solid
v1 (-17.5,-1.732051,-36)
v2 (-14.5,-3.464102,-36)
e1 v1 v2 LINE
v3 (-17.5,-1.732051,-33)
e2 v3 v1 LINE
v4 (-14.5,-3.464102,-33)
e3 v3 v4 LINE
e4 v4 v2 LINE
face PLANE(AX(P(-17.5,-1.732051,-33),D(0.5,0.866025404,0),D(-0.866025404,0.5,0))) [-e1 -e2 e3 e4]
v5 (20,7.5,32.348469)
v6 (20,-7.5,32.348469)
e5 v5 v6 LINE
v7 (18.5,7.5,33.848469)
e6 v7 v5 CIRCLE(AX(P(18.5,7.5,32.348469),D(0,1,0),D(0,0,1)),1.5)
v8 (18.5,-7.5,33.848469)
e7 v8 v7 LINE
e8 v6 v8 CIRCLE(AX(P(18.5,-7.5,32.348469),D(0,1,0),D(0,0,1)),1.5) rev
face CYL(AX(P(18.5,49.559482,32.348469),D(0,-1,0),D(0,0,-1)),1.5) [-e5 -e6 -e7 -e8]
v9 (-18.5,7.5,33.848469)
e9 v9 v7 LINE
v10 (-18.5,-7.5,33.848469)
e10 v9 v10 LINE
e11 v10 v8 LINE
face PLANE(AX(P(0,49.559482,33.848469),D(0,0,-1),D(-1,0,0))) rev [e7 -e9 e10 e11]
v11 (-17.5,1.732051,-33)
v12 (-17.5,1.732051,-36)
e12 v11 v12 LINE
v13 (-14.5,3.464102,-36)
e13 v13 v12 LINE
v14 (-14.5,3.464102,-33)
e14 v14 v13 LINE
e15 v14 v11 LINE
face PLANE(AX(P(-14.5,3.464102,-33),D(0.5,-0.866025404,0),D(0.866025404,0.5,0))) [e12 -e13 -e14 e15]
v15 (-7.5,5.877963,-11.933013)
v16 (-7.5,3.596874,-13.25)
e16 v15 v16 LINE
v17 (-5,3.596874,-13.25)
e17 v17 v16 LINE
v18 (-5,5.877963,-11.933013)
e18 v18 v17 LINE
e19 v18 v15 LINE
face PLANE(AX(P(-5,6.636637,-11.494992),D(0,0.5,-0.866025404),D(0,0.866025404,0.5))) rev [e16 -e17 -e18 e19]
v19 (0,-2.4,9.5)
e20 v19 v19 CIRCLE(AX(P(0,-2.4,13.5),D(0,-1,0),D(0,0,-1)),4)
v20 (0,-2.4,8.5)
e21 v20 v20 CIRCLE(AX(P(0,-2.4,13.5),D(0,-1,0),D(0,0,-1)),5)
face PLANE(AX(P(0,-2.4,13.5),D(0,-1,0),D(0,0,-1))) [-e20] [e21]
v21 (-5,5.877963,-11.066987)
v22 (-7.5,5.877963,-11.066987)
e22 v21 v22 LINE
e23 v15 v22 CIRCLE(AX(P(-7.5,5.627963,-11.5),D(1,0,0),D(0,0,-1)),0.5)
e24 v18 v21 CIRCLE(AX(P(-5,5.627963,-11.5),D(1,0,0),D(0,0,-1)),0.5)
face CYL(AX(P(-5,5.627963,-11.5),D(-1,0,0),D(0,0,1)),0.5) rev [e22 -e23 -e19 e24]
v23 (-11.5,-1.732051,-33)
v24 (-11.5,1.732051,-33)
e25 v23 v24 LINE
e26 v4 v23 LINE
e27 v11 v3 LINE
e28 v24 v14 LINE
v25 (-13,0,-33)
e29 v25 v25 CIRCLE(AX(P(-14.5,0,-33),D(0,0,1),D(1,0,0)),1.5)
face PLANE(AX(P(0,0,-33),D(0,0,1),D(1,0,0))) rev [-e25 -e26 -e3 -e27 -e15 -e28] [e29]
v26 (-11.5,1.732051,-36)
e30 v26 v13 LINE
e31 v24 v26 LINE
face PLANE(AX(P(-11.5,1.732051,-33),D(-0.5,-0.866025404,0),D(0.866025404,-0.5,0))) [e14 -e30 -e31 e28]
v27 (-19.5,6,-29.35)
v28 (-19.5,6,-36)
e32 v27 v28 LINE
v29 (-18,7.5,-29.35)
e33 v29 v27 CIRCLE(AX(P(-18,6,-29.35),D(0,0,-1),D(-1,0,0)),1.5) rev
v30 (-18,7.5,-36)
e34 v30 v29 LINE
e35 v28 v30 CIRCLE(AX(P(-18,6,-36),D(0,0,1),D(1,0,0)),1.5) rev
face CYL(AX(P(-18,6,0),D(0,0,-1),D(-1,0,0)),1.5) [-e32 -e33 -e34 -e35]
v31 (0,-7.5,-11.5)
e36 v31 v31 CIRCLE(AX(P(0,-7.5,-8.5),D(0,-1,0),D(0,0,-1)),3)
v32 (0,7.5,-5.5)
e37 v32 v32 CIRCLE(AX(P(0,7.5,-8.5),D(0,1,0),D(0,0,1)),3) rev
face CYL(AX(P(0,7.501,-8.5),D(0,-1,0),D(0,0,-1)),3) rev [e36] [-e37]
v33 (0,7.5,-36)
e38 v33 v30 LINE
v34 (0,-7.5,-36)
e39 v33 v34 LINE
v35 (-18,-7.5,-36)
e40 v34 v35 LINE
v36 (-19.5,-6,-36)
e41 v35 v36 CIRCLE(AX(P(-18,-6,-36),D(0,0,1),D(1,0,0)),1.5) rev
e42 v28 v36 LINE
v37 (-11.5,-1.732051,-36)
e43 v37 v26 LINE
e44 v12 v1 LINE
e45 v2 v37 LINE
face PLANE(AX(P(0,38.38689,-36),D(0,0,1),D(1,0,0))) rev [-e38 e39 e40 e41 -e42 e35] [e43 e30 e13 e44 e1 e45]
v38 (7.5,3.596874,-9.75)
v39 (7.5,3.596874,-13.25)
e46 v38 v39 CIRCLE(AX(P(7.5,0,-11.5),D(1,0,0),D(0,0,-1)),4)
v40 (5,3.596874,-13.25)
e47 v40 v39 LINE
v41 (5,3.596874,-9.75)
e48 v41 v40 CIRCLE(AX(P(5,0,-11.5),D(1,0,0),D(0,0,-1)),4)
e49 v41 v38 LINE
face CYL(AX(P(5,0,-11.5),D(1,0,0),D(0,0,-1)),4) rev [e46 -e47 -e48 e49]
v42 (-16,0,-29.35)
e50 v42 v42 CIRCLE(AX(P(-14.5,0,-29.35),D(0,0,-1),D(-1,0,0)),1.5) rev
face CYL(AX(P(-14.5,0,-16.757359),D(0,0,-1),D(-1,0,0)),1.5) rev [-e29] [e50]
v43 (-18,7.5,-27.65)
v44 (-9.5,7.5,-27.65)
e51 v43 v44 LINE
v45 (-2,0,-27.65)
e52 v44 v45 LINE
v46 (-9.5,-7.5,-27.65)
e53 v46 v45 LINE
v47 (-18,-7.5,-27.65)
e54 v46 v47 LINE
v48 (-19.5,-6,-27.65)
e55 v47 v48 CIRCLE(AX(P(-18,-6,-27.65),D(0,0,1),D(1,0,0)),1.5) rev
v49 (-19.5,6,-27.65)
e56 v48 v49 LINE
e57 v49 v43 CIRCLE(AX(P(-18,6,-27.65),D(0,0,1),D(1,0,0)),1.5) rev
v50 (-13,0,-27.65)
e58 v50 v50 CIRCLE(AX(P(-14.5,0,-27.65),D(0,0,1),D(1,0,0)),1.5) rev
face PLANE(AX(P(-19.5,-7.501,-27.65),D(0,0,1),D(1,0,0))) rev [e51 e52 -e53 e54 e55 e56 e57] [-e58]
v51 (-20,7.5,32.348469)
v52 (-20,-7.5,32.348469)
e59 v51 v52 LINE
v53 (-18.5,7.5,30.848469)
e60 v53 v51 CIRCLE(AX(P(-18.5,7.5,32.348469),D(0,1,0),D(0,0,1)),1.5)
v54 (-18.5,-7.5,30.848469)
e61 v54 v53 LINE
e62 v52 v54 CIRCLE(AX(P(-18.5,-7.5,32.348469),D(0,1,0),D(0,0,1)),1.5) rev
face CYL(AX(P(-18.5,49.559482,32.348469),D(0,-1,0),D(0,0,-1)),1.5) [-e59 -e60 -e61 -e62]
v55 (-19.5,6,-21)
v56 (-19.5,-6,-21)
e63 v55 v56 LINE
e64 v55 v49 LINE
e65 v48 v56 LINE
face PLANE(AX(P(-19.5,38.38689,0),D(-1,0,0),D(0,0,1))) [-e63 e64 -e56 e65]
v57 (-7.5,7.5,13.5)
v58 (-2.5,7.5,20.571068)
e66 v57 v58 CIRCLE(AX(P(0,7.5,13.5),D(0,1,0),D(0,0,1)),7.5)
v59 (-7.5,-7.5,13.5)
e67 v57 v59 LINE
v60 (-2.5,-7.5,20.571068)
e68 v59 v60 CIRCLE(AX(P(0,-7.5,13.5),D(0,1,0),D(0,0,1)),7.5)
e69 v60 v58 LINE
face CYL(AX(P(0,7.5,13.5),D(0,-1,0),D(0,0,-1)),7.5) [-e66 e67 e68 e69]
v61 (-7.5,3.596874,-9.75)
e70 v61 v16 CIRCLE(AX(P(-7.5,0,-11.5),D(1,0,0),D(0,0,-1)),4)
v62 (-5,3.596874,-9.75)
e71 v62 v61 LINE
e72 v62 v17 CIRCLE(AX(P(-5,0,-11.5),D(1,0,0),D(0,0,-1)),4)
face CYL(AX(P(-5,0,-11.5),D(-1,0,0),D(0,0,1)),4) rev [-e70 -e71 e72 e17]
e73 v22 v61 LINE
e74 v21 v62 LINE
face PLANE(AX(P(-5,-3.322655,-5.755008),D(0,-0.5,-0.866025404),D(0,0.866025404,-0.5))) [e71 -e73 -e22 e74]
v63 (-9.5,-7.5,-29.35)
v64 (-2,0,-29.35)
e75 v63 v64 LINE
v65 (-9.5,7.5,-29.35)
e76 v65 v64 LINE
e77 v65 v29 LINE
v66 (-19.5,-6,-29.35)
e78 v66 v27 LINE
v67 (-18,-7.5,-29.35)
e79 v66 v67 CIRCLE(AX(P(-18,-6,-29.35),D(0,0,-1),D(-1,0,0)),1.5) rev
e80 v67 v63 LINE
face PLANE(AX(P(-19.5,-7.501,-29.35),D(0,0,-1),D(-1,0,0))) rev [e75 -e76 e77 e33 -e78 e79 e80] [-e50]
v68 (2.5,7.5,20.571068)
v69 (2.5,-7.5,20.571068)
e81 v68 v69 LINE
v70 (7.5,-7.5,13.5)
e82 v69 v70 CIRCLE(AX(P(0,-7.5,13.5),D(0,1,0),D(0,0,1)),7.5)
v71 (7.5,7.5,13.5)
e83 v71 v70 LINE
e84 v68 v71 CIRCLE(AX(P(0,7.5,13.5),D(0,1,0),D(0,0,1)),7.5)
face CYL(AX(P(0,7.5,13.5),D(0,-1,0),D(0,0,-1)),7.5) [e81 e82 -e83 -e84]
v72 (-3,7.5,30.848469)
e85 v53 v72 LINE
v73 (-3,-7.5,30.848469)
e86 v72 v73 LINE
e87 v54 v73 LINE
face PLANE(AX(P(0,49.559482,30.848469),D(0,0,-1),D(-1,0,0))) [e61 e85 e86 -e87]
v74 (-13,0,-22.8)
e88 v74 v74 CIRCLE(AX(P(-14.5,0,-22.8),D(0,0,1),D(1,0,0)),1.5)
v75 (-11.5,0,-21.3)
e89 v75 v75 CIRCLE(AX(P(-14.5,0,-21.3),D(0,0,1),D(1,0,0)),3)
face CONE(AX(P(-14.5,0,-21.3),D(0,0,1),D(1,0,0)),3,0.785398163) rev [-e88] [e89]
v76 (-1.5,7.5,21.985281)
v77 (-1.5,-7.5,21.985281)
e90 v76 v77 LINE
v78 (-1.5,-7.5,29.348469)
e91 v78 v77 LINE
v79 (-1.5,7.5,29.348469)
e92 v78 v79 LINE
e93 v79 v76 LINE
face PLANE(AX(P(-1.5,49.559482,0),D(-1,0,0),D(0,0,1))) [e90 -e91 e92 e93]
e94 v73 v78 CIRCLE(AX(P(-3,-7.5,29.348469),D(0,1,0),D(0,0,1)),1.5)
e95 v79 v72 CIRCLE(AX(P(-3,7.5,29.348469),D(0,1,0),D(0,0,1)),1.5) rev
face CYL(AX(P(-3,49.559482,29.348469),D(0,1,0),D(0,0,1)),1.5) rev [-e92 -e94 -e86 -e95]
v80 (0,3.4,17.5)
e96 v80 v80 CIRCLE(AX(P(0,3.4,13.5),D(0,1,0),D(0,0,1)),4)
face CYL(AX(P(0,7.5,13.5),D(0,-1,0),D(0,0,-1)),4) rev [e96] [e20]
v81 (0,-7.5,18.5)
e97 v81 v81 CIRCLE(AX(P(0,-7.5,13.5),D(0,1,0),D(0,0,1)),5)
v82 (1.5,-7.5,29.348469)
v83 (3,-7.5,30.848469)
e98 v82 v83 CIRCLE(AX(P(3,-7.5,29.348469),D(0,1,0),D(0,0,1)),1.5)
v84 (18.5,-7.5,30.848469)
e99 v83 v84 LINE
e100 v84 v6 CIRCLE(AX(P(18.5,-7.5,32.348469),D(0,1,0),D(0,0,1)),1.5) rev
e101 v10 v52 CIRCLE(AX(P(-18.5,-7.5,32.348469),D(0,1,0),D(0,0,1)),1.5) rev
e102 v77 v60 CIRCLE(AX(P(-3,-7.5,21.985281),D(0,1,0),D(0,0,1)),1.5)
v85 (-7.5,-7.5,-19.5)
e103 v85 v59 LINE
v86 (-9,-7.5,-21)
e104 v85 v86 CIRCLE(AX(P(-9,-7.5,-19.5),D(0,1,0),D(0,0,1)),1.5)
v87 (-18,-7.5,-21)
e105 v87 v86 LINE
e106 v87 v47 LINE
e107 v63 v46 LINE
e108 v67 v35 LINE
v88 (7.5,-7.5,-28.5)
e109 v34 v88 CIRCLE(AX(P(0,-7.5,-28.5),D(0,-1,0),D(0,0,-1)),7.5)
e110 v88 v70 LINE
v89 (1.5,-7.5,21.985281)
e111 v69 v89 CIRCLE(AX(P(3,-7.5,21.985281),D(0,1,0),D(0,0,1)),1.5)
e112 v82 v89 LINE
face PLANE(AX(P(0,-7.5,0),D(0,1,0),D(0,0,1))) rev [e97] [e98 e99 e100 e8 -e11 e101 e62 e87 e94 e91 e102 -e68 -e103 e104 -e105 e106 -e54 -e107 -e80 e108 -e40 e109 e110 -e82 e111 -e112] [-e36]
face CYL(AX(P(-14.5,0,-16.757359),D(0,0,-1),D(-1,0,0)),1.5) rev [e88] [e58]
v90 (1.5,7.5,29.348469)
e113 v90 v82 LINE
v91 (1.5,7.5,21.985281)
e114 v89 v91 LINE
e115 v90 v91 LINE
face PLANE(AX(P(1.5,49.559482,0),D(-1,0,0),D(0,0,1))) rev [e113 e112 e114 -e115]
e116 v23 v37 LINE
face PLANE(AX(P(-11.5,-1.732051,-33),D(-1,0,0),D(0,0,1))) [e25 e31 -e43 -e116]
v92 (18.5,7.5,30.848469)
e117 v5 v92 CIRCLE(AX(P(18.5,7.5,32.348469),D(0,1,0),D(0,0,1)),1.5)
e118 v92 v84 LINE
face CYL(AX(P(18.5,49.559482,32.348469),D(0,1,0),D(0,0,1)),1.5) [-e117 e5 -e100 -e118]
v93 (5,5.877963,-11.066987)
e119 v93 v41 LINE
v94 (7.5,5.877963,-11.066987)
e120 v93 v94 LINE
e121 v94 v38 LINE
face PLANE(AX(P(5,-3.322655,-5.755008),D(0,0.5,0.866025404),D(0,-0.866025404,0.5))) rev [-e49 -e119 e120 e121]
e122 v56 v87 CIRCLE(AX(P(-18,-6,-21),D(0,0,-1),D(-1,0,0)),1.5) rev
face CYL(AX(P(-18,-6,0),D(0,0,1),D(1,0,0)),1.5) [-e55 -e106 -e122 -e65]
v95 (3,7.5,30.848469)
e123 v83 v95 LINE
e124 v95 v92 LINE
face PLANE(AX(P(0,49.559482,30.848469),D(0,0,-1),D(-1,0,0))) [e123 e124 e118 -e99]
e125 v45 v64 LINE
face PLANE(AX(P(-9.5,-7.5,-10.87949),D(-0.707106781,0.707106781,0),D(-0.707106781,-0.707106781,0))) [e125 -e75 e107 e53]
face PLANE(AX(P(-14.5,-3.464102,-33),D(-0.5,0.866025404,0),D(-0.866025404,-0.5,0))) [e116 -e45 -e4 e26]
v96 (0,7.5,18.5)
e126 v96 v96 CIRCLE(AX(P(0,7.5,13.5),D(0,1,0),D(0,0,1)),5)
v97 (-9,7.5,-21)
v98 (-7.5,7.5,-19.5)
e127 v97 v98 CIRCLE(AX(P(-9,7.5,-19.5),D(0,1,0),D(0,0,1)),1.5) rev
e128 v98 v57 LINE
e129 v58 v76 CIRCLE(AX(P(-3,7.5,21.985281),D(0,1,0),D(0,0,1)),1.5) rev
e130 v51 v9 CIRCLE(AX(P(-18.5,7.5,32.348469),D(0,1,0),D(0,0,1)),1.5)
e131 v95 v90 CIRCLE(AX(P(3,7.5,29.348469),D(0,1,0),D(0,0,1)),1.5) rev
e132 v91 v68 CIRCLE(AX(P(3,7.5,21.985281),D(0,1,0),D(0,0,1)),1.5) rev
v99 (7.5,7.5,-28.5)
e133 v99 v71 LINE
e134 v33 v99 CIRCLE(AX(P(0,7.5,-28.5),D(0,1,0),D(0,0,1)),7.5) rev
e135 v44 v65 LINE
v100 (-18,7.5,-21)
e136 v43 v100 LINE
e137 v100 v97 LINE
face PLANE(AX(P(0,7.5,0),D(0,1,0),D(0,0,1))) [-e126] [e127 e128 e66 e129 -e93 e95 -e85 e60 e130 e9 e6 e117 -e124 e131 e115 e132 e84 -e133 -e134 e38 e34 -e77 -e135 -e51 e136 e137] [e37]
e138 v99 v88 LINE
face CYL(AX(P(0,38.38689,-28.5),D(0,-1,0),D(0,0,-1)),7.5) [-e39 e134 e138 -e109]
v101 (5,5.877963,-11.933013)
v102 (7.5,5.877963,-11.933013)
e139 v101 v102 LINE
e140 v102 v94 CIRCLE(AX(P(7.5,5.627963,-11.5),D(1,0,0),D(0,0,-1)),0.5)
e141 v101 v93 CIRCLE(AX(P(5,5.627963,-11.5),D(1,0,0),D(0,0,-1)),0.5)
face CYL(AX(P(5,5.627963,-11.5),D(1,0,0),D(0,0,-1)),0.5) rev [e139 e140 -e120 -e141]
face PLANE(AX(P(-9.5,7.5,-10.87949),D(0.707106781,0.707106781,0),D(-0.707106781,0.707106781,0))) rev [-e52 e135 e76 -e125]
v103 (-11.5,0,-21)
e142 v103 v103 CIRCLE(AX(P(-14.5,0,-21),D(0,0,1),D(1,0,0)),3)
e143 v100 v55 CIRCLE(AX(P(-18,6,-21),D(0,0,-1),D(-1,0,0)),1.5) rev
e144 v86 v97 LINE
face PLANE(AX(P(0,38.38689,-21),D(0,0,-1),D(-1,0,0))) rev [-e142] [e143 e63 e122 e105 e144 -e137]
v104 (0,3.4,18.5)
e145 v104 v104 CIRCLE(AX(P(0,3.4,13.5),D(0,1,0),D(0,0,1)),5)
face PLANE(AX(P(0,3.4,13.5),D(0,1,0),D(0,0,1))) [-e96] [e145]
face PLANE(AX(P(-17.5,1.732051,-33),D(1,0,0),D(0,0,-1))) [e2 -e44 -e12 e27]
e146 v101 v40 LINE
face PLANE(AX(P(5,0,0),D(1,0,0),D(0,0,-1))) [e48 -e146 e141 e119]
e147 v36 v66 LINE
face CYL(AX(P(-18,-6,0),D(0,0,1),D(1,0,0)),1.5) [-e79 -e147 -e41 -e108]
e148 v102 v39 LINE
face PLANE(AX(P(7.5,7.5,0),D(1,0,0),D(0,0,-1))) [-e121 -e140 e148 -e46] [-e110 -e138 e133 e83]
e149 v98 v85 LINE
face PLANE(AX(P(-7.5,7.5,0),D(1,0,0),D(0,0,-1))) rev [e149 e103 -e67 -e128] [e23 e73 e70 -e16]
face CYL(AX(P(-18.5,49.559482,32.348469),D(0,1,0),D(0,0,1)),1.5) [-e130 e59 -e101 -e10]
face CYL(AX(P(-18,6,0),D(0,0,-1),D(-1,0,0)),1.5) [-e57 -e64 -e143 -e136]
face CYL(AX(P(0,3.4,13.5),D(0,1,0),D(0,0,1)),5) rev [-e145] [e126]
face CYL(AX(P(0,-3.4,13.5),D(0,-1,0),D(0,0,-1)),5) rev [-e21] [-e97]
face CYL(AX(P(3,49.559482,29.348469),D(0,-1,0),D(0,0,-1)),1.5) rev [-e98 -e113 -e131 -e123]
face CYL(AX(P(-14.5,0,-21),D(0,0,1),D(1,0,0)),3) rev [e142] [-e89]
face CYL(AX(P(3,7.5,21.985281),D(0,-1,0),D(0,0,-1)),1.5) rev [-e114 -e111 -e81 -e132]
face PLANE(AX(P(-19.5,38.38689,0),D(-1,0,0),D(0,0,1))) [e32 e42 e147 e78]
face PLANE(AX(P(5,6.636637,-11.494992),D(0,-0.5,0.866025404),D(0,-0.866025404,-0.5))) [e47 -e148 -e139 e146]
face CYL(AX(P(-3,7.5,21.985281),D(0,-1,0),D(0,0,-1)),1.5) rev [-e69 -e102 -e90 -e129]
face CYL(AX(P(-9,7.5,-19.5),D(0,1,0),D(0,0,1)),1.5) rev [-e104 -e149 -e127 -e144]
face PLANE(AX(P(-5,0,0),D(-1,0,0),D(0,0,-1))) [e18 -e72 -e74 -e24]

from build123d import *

# Parameters (mm, degrees)
SKETCH1_R           = 4
BOSS_EXTRUDE1_DEPTH = 7.5
SKETCH2_R           = 5
CUT_EXTRUDE1_DEPTH  = 4.1
SKETCH12_R          = 5
SKETCH12_R_2        = 4
CUT_EXTRUDE10_DEPTH = 1
CUT_EXTRUDE3_DEPTH  = 2.5
BOSS_EXTRUDE3_DEPTH = 15
CUT_EXTRUDE7_REACH  = 45.603
SKETCH7_W           = 10
SKETCH7_H           = 1.7
CUT_EXTRUDE8_REACH  = 76.732
SKETCH8_R           = 1.5
CUT_EXTRUDE9_DEPTH  = 3
CUT_EXTRUDE11_DEPTH = 1.7
BOSS_EXTRUDE2_START = -15
BOSS_EXTRUDE2_DEPTH = 15
FILLET8_R           = 1.5
CUT_EXTRUDE12_REACH = 45.829
SKETCH19_R          = 3


with BuildPart() as part:
    # Sketch1 → Boss-Extrude1 (new, symmetric)
    with BuildSketch(Plane(origin=(0, 0, 0), x_dir=(1, 0, 0), z_dir=(0, 1, 0))):
        with BuildLine():
            Line((7.5, 21), (-7.5, 21))
            Line((-7.5, 21), (-7.5, -13.499999984))
            ThreePointArc((-7.5, -13.499999984), (-8e-09, -21), (7.5, -13.5))
            Line((7.5, -13.5), (7.5, 21))
        make_face()
        with Locations(Location((0, -13.5, 0), (0, 0, 270))):
            Circle(SKETCH1_R, mode=Mode.SUBTRACT)
    extrude(amount=BOSS_EXTRUDE1_DEPTH, both=True)

    # Sketch2 → Cut-Extrude1 (cut)
    with BuildSketch(Plane(origin=(0, 7.5, 0), x_dir=(1, 0, 0), z_dir=(0, 1, 0))):
        with Locations(Location((0, -13.5, 0), (0, 0, 270))):
            Circle(SKETCH2_R)
    cut_extrude1 = extrude(amount=-CUT_EXTRUDE1_DEPTH, mode=Mode.SUBTRACT)

    # Mirror1: Cut-Extrude1 across plane
    add(cut_extrude1.mirror(Plane.ZX), mode=Mode.SUBTRACT)

    # Sketch12 → Cut-Extrude10 (cut)
    with BuildSketch(Plane.XZ.offset(3.4)):
        with Locations(Location((0, 13.5, 0), (0, 0, 90))):
            Circle(SKETCH12_R)
        with Locations(Location((0, 13.5, 0), (0, 0, 270))):
            Circle(SKETCH12_R_2, mode=Mode.SUBTRACT)
    extrude(amount=-CUT_EXTRUDE10_DEPTH, mode=Mode.SUBTRACT)

    # Sketch4 → Cut-Extrude3 (cut)
    with BuildSketch(Plane(origin=(7.5, 0, 0), x_dir=(0, 0, -1), z_dir=(1, 0, 0))):
        with BuildLine():
            Line((13.25, 3.596873642), (11.933012728, 5.87796251))
            ThreePointArc((11.933012728, 5.87796251), (11.500000041, 6.127962556), (11.066987313, 5.877962581))
            Line((11.066987313, 5.877962581), (9.75, 3.596873642))
            ThreePointArc((9.75, 3.596873642), (11.5, -4), (13.25, 3.596873642))
        make_face()
    cut_extrude3 = extrude(amount=-CUT_EXTRUDE3_DEPTH, mode=Mode.SUBTRACT)

    # Mirror2: Cut-Extrude3 across plane
    add(cut_extrude3.mirror(Plane(origin=(0, 0, 0), x_dir=(0, 0, 1), z_dir=(1, 0, 0))), mode=Mode.SUBTRACT)

    # Sketch18 → Boss-Extrude3 (add)
    with BuildSketch(Plane.XZ.offset(7.5)):
        with BuildLine():
            Line((-19.5, -21), (-19.5, -36))
            Line((-19.5, -36), (0, -36))
            ThreePointArc((0, -36), (5.303300859, -33.803300859), (7.5, -28.5))
            Line((7.5, -28.5), (7.5, -21))
            Line((7.5, -21), (-19.5, -21))
        make_face()
    extrude(amount=-BOSS_EXTRUDE3_DEPTH)

    # Sketch7 → Cut-Extrude7 (cut, up to next)
    with BuildSketch(Plane(origin=(0, 7.5, 0), x_dir=(1, 0, 0), z_dir=(0, 1, 0)), mode=Mode.PRIVATE) as cut_extrude7_sk1:
        with Locations((-14.5, 28.5)):
            Rectangle(SKETCH7_W, SKETCH7_H)
    cut_extrude7_tool1 = extrude(cut_extrude7_sk1.sketch, amount=-CUT_EXTRUDE7_REACH, mode=Mode.PRIVATE) & part.part
    add(cut_extrude7_tool1.solids().sort_by_distance((-14.5, 7.5, -28.5))[0], mode=Mode.SUBTRACT)

    # Cut-Extrude8: up to this face of the body (flat: up to its plane)
    cut_extrude8_end = Plane(part.part.faces().sort_by_distance((-13.5, 0, -21))[0])
    # Sketch8 → Cut-Extrude8 (cut, up to the picked face)
    with BuildSketch(Plane(origin=(-40.245190528, 0, -36), x_dir=(1, 0, 0), z_dir=(0, 0, 1)), mode=Mode.PRIVATE) as cut_extrude8_sk1:
        with Locations(Location((25.745190528, 0, 0), (0, 0, 180))):
            Circle(SKETCH8_R)
    cut_extrude8_tool1 = split(extrude(cut_extrude8_sk1.sketch, amount=CUT_EXTRUDE8_REACH, mode=Mode.PRIVATE), bisect_by=cut_extrude8_end, keep=Keep.BOTH, mode=Mode.PRIVATE)
    add(cut_extrude8_tool1.solids().sort_by(Axis((-14.5, 0, -36), (0, 0, 1)))[0], mode=Mode.SUBTRACT)

    # Sketch10 → CSK for M3 Flat Head Machine Screw1 (revolve, cut)
    with BuildSketch(Plane(origin=(-14.5, 0, -21), x_dir=(0, -1, 0), z_dir=(1, 0, 0))):
        Polygon((0, 0), (0, 5.901290929), (1.5, 5), (1.5, 1.8), (3, 0.3), (3, 0), align=None)
    revolve(axis=Axis((-14.5, 0, -14.65), (0, 0, -1)), mode=Mode.SUBTRACT)

    # Sketch11 → Cut-Extrude9 (cut)
    with BuildSketch(Plane(origin=(15, 0, -36), x_dir=(1, 0, 0), z_dir=(0, 0, 1))):
        Polygon((-29.5, -3.464101615), (-26.5, -1.732050808), (-26.5, 1.732050808), (-29.5, 3.464101615), (-32.5, 1.732050808), (-32.5, -1.732050808), align=None)
    extrude(amount=CUT_EXTRUDE9_DEPTH, mode=Mode.SUBTRACT)

    # Sketch13 → Cut-Extrude11 (cut)
    with BuildSketch(Plane(origin=(-44.653589838, 0, -29.35), x_dir=(1, 0, 0), z_dir=(0, 0, 1))):
        Polygon((35.153589838, 7.5), (42.653589838, 0), (35.153589838, -7.5), align=None)
    extrude(amount=CUT_EXTRUDE11_DEPTH, mode=Mode.SUBTRACT)

    # Sketch16 → Boss-Extrude2 (add)
    with BuildSketch(Plane.XZ.offset(7.5).offset(BOSS_EXTRUDE2_START)):
        with BuildLine():
            Line((1.5, 30.848469228), (-1.5, 30.848469228))
            Line((-1.5, 30.848469228), (-1.5, 20.848469228))
            ThreePointArc((-1.5, 20.848469228), (0, 21), (1.5, 20.848469228))
            Line((1.5, 20.848469228), (1.5, 30.848469228))
        make_face()
        Polygon((-20, 30.848469228), (-1.5, 30.848469228), (1.5, 30.848469228), (20, 30.848469228), (20, 33.848469228), (-20, 33.848469228), align=None)
    extrude(amount=BOSS_EXTRUDE2_DEPTH)

    # Fillet8
    fillet8_edges = [part.edges().sort_by_distance(p)[0] for p in [
        (20, 0, 30.848469228),
        (20, 0, 33.848469228),
        (-20, 0, 33.848469228),
        (-20, 0, 30.848469228),
        (-1.5, 0, 30.848469228),
        (-1.5, 0, 20.848469228),
        (1.5, 0, 20.848469228),
        (1.5, 0, 30.848469228),
        (-19.5, -7.5, -24.325),
        (-19.5, 7.5, -24.325),
        (-19.5, 7.5, -32.675),
        (-19.5, -7.5, -32.675),
        (-7.5, 0, -21),
    ]]
    fillet(fillet8_edges, radius=FILLET8_R - 0.0001)  # a hair under: the kernel refuses the full size

    # Sketch19 → Cut-Extrude12 (cut, up to next)
    with BuildSketch(Plane.XZ.offset(7.5), mode=Mode.PRIVATE) as cut_extrude12_sk1:
        with Locations(Location((0, -8.5, 0), (0, 0, 270))):
            Circle(SKETCH19_R)
    cut_extrude12_tool1 = extrude(cut_extrude12_sk1.sketch, amount=-CUT_EXTRUDE12_REACH, mode=Mode.PRIVATE) & part.part
    add(cut_extrude12_tool1.solids().sort_by_distance((0, -7.5, -8.5))[0], mode=Mode.SUBTRACT)


solid = part.part
